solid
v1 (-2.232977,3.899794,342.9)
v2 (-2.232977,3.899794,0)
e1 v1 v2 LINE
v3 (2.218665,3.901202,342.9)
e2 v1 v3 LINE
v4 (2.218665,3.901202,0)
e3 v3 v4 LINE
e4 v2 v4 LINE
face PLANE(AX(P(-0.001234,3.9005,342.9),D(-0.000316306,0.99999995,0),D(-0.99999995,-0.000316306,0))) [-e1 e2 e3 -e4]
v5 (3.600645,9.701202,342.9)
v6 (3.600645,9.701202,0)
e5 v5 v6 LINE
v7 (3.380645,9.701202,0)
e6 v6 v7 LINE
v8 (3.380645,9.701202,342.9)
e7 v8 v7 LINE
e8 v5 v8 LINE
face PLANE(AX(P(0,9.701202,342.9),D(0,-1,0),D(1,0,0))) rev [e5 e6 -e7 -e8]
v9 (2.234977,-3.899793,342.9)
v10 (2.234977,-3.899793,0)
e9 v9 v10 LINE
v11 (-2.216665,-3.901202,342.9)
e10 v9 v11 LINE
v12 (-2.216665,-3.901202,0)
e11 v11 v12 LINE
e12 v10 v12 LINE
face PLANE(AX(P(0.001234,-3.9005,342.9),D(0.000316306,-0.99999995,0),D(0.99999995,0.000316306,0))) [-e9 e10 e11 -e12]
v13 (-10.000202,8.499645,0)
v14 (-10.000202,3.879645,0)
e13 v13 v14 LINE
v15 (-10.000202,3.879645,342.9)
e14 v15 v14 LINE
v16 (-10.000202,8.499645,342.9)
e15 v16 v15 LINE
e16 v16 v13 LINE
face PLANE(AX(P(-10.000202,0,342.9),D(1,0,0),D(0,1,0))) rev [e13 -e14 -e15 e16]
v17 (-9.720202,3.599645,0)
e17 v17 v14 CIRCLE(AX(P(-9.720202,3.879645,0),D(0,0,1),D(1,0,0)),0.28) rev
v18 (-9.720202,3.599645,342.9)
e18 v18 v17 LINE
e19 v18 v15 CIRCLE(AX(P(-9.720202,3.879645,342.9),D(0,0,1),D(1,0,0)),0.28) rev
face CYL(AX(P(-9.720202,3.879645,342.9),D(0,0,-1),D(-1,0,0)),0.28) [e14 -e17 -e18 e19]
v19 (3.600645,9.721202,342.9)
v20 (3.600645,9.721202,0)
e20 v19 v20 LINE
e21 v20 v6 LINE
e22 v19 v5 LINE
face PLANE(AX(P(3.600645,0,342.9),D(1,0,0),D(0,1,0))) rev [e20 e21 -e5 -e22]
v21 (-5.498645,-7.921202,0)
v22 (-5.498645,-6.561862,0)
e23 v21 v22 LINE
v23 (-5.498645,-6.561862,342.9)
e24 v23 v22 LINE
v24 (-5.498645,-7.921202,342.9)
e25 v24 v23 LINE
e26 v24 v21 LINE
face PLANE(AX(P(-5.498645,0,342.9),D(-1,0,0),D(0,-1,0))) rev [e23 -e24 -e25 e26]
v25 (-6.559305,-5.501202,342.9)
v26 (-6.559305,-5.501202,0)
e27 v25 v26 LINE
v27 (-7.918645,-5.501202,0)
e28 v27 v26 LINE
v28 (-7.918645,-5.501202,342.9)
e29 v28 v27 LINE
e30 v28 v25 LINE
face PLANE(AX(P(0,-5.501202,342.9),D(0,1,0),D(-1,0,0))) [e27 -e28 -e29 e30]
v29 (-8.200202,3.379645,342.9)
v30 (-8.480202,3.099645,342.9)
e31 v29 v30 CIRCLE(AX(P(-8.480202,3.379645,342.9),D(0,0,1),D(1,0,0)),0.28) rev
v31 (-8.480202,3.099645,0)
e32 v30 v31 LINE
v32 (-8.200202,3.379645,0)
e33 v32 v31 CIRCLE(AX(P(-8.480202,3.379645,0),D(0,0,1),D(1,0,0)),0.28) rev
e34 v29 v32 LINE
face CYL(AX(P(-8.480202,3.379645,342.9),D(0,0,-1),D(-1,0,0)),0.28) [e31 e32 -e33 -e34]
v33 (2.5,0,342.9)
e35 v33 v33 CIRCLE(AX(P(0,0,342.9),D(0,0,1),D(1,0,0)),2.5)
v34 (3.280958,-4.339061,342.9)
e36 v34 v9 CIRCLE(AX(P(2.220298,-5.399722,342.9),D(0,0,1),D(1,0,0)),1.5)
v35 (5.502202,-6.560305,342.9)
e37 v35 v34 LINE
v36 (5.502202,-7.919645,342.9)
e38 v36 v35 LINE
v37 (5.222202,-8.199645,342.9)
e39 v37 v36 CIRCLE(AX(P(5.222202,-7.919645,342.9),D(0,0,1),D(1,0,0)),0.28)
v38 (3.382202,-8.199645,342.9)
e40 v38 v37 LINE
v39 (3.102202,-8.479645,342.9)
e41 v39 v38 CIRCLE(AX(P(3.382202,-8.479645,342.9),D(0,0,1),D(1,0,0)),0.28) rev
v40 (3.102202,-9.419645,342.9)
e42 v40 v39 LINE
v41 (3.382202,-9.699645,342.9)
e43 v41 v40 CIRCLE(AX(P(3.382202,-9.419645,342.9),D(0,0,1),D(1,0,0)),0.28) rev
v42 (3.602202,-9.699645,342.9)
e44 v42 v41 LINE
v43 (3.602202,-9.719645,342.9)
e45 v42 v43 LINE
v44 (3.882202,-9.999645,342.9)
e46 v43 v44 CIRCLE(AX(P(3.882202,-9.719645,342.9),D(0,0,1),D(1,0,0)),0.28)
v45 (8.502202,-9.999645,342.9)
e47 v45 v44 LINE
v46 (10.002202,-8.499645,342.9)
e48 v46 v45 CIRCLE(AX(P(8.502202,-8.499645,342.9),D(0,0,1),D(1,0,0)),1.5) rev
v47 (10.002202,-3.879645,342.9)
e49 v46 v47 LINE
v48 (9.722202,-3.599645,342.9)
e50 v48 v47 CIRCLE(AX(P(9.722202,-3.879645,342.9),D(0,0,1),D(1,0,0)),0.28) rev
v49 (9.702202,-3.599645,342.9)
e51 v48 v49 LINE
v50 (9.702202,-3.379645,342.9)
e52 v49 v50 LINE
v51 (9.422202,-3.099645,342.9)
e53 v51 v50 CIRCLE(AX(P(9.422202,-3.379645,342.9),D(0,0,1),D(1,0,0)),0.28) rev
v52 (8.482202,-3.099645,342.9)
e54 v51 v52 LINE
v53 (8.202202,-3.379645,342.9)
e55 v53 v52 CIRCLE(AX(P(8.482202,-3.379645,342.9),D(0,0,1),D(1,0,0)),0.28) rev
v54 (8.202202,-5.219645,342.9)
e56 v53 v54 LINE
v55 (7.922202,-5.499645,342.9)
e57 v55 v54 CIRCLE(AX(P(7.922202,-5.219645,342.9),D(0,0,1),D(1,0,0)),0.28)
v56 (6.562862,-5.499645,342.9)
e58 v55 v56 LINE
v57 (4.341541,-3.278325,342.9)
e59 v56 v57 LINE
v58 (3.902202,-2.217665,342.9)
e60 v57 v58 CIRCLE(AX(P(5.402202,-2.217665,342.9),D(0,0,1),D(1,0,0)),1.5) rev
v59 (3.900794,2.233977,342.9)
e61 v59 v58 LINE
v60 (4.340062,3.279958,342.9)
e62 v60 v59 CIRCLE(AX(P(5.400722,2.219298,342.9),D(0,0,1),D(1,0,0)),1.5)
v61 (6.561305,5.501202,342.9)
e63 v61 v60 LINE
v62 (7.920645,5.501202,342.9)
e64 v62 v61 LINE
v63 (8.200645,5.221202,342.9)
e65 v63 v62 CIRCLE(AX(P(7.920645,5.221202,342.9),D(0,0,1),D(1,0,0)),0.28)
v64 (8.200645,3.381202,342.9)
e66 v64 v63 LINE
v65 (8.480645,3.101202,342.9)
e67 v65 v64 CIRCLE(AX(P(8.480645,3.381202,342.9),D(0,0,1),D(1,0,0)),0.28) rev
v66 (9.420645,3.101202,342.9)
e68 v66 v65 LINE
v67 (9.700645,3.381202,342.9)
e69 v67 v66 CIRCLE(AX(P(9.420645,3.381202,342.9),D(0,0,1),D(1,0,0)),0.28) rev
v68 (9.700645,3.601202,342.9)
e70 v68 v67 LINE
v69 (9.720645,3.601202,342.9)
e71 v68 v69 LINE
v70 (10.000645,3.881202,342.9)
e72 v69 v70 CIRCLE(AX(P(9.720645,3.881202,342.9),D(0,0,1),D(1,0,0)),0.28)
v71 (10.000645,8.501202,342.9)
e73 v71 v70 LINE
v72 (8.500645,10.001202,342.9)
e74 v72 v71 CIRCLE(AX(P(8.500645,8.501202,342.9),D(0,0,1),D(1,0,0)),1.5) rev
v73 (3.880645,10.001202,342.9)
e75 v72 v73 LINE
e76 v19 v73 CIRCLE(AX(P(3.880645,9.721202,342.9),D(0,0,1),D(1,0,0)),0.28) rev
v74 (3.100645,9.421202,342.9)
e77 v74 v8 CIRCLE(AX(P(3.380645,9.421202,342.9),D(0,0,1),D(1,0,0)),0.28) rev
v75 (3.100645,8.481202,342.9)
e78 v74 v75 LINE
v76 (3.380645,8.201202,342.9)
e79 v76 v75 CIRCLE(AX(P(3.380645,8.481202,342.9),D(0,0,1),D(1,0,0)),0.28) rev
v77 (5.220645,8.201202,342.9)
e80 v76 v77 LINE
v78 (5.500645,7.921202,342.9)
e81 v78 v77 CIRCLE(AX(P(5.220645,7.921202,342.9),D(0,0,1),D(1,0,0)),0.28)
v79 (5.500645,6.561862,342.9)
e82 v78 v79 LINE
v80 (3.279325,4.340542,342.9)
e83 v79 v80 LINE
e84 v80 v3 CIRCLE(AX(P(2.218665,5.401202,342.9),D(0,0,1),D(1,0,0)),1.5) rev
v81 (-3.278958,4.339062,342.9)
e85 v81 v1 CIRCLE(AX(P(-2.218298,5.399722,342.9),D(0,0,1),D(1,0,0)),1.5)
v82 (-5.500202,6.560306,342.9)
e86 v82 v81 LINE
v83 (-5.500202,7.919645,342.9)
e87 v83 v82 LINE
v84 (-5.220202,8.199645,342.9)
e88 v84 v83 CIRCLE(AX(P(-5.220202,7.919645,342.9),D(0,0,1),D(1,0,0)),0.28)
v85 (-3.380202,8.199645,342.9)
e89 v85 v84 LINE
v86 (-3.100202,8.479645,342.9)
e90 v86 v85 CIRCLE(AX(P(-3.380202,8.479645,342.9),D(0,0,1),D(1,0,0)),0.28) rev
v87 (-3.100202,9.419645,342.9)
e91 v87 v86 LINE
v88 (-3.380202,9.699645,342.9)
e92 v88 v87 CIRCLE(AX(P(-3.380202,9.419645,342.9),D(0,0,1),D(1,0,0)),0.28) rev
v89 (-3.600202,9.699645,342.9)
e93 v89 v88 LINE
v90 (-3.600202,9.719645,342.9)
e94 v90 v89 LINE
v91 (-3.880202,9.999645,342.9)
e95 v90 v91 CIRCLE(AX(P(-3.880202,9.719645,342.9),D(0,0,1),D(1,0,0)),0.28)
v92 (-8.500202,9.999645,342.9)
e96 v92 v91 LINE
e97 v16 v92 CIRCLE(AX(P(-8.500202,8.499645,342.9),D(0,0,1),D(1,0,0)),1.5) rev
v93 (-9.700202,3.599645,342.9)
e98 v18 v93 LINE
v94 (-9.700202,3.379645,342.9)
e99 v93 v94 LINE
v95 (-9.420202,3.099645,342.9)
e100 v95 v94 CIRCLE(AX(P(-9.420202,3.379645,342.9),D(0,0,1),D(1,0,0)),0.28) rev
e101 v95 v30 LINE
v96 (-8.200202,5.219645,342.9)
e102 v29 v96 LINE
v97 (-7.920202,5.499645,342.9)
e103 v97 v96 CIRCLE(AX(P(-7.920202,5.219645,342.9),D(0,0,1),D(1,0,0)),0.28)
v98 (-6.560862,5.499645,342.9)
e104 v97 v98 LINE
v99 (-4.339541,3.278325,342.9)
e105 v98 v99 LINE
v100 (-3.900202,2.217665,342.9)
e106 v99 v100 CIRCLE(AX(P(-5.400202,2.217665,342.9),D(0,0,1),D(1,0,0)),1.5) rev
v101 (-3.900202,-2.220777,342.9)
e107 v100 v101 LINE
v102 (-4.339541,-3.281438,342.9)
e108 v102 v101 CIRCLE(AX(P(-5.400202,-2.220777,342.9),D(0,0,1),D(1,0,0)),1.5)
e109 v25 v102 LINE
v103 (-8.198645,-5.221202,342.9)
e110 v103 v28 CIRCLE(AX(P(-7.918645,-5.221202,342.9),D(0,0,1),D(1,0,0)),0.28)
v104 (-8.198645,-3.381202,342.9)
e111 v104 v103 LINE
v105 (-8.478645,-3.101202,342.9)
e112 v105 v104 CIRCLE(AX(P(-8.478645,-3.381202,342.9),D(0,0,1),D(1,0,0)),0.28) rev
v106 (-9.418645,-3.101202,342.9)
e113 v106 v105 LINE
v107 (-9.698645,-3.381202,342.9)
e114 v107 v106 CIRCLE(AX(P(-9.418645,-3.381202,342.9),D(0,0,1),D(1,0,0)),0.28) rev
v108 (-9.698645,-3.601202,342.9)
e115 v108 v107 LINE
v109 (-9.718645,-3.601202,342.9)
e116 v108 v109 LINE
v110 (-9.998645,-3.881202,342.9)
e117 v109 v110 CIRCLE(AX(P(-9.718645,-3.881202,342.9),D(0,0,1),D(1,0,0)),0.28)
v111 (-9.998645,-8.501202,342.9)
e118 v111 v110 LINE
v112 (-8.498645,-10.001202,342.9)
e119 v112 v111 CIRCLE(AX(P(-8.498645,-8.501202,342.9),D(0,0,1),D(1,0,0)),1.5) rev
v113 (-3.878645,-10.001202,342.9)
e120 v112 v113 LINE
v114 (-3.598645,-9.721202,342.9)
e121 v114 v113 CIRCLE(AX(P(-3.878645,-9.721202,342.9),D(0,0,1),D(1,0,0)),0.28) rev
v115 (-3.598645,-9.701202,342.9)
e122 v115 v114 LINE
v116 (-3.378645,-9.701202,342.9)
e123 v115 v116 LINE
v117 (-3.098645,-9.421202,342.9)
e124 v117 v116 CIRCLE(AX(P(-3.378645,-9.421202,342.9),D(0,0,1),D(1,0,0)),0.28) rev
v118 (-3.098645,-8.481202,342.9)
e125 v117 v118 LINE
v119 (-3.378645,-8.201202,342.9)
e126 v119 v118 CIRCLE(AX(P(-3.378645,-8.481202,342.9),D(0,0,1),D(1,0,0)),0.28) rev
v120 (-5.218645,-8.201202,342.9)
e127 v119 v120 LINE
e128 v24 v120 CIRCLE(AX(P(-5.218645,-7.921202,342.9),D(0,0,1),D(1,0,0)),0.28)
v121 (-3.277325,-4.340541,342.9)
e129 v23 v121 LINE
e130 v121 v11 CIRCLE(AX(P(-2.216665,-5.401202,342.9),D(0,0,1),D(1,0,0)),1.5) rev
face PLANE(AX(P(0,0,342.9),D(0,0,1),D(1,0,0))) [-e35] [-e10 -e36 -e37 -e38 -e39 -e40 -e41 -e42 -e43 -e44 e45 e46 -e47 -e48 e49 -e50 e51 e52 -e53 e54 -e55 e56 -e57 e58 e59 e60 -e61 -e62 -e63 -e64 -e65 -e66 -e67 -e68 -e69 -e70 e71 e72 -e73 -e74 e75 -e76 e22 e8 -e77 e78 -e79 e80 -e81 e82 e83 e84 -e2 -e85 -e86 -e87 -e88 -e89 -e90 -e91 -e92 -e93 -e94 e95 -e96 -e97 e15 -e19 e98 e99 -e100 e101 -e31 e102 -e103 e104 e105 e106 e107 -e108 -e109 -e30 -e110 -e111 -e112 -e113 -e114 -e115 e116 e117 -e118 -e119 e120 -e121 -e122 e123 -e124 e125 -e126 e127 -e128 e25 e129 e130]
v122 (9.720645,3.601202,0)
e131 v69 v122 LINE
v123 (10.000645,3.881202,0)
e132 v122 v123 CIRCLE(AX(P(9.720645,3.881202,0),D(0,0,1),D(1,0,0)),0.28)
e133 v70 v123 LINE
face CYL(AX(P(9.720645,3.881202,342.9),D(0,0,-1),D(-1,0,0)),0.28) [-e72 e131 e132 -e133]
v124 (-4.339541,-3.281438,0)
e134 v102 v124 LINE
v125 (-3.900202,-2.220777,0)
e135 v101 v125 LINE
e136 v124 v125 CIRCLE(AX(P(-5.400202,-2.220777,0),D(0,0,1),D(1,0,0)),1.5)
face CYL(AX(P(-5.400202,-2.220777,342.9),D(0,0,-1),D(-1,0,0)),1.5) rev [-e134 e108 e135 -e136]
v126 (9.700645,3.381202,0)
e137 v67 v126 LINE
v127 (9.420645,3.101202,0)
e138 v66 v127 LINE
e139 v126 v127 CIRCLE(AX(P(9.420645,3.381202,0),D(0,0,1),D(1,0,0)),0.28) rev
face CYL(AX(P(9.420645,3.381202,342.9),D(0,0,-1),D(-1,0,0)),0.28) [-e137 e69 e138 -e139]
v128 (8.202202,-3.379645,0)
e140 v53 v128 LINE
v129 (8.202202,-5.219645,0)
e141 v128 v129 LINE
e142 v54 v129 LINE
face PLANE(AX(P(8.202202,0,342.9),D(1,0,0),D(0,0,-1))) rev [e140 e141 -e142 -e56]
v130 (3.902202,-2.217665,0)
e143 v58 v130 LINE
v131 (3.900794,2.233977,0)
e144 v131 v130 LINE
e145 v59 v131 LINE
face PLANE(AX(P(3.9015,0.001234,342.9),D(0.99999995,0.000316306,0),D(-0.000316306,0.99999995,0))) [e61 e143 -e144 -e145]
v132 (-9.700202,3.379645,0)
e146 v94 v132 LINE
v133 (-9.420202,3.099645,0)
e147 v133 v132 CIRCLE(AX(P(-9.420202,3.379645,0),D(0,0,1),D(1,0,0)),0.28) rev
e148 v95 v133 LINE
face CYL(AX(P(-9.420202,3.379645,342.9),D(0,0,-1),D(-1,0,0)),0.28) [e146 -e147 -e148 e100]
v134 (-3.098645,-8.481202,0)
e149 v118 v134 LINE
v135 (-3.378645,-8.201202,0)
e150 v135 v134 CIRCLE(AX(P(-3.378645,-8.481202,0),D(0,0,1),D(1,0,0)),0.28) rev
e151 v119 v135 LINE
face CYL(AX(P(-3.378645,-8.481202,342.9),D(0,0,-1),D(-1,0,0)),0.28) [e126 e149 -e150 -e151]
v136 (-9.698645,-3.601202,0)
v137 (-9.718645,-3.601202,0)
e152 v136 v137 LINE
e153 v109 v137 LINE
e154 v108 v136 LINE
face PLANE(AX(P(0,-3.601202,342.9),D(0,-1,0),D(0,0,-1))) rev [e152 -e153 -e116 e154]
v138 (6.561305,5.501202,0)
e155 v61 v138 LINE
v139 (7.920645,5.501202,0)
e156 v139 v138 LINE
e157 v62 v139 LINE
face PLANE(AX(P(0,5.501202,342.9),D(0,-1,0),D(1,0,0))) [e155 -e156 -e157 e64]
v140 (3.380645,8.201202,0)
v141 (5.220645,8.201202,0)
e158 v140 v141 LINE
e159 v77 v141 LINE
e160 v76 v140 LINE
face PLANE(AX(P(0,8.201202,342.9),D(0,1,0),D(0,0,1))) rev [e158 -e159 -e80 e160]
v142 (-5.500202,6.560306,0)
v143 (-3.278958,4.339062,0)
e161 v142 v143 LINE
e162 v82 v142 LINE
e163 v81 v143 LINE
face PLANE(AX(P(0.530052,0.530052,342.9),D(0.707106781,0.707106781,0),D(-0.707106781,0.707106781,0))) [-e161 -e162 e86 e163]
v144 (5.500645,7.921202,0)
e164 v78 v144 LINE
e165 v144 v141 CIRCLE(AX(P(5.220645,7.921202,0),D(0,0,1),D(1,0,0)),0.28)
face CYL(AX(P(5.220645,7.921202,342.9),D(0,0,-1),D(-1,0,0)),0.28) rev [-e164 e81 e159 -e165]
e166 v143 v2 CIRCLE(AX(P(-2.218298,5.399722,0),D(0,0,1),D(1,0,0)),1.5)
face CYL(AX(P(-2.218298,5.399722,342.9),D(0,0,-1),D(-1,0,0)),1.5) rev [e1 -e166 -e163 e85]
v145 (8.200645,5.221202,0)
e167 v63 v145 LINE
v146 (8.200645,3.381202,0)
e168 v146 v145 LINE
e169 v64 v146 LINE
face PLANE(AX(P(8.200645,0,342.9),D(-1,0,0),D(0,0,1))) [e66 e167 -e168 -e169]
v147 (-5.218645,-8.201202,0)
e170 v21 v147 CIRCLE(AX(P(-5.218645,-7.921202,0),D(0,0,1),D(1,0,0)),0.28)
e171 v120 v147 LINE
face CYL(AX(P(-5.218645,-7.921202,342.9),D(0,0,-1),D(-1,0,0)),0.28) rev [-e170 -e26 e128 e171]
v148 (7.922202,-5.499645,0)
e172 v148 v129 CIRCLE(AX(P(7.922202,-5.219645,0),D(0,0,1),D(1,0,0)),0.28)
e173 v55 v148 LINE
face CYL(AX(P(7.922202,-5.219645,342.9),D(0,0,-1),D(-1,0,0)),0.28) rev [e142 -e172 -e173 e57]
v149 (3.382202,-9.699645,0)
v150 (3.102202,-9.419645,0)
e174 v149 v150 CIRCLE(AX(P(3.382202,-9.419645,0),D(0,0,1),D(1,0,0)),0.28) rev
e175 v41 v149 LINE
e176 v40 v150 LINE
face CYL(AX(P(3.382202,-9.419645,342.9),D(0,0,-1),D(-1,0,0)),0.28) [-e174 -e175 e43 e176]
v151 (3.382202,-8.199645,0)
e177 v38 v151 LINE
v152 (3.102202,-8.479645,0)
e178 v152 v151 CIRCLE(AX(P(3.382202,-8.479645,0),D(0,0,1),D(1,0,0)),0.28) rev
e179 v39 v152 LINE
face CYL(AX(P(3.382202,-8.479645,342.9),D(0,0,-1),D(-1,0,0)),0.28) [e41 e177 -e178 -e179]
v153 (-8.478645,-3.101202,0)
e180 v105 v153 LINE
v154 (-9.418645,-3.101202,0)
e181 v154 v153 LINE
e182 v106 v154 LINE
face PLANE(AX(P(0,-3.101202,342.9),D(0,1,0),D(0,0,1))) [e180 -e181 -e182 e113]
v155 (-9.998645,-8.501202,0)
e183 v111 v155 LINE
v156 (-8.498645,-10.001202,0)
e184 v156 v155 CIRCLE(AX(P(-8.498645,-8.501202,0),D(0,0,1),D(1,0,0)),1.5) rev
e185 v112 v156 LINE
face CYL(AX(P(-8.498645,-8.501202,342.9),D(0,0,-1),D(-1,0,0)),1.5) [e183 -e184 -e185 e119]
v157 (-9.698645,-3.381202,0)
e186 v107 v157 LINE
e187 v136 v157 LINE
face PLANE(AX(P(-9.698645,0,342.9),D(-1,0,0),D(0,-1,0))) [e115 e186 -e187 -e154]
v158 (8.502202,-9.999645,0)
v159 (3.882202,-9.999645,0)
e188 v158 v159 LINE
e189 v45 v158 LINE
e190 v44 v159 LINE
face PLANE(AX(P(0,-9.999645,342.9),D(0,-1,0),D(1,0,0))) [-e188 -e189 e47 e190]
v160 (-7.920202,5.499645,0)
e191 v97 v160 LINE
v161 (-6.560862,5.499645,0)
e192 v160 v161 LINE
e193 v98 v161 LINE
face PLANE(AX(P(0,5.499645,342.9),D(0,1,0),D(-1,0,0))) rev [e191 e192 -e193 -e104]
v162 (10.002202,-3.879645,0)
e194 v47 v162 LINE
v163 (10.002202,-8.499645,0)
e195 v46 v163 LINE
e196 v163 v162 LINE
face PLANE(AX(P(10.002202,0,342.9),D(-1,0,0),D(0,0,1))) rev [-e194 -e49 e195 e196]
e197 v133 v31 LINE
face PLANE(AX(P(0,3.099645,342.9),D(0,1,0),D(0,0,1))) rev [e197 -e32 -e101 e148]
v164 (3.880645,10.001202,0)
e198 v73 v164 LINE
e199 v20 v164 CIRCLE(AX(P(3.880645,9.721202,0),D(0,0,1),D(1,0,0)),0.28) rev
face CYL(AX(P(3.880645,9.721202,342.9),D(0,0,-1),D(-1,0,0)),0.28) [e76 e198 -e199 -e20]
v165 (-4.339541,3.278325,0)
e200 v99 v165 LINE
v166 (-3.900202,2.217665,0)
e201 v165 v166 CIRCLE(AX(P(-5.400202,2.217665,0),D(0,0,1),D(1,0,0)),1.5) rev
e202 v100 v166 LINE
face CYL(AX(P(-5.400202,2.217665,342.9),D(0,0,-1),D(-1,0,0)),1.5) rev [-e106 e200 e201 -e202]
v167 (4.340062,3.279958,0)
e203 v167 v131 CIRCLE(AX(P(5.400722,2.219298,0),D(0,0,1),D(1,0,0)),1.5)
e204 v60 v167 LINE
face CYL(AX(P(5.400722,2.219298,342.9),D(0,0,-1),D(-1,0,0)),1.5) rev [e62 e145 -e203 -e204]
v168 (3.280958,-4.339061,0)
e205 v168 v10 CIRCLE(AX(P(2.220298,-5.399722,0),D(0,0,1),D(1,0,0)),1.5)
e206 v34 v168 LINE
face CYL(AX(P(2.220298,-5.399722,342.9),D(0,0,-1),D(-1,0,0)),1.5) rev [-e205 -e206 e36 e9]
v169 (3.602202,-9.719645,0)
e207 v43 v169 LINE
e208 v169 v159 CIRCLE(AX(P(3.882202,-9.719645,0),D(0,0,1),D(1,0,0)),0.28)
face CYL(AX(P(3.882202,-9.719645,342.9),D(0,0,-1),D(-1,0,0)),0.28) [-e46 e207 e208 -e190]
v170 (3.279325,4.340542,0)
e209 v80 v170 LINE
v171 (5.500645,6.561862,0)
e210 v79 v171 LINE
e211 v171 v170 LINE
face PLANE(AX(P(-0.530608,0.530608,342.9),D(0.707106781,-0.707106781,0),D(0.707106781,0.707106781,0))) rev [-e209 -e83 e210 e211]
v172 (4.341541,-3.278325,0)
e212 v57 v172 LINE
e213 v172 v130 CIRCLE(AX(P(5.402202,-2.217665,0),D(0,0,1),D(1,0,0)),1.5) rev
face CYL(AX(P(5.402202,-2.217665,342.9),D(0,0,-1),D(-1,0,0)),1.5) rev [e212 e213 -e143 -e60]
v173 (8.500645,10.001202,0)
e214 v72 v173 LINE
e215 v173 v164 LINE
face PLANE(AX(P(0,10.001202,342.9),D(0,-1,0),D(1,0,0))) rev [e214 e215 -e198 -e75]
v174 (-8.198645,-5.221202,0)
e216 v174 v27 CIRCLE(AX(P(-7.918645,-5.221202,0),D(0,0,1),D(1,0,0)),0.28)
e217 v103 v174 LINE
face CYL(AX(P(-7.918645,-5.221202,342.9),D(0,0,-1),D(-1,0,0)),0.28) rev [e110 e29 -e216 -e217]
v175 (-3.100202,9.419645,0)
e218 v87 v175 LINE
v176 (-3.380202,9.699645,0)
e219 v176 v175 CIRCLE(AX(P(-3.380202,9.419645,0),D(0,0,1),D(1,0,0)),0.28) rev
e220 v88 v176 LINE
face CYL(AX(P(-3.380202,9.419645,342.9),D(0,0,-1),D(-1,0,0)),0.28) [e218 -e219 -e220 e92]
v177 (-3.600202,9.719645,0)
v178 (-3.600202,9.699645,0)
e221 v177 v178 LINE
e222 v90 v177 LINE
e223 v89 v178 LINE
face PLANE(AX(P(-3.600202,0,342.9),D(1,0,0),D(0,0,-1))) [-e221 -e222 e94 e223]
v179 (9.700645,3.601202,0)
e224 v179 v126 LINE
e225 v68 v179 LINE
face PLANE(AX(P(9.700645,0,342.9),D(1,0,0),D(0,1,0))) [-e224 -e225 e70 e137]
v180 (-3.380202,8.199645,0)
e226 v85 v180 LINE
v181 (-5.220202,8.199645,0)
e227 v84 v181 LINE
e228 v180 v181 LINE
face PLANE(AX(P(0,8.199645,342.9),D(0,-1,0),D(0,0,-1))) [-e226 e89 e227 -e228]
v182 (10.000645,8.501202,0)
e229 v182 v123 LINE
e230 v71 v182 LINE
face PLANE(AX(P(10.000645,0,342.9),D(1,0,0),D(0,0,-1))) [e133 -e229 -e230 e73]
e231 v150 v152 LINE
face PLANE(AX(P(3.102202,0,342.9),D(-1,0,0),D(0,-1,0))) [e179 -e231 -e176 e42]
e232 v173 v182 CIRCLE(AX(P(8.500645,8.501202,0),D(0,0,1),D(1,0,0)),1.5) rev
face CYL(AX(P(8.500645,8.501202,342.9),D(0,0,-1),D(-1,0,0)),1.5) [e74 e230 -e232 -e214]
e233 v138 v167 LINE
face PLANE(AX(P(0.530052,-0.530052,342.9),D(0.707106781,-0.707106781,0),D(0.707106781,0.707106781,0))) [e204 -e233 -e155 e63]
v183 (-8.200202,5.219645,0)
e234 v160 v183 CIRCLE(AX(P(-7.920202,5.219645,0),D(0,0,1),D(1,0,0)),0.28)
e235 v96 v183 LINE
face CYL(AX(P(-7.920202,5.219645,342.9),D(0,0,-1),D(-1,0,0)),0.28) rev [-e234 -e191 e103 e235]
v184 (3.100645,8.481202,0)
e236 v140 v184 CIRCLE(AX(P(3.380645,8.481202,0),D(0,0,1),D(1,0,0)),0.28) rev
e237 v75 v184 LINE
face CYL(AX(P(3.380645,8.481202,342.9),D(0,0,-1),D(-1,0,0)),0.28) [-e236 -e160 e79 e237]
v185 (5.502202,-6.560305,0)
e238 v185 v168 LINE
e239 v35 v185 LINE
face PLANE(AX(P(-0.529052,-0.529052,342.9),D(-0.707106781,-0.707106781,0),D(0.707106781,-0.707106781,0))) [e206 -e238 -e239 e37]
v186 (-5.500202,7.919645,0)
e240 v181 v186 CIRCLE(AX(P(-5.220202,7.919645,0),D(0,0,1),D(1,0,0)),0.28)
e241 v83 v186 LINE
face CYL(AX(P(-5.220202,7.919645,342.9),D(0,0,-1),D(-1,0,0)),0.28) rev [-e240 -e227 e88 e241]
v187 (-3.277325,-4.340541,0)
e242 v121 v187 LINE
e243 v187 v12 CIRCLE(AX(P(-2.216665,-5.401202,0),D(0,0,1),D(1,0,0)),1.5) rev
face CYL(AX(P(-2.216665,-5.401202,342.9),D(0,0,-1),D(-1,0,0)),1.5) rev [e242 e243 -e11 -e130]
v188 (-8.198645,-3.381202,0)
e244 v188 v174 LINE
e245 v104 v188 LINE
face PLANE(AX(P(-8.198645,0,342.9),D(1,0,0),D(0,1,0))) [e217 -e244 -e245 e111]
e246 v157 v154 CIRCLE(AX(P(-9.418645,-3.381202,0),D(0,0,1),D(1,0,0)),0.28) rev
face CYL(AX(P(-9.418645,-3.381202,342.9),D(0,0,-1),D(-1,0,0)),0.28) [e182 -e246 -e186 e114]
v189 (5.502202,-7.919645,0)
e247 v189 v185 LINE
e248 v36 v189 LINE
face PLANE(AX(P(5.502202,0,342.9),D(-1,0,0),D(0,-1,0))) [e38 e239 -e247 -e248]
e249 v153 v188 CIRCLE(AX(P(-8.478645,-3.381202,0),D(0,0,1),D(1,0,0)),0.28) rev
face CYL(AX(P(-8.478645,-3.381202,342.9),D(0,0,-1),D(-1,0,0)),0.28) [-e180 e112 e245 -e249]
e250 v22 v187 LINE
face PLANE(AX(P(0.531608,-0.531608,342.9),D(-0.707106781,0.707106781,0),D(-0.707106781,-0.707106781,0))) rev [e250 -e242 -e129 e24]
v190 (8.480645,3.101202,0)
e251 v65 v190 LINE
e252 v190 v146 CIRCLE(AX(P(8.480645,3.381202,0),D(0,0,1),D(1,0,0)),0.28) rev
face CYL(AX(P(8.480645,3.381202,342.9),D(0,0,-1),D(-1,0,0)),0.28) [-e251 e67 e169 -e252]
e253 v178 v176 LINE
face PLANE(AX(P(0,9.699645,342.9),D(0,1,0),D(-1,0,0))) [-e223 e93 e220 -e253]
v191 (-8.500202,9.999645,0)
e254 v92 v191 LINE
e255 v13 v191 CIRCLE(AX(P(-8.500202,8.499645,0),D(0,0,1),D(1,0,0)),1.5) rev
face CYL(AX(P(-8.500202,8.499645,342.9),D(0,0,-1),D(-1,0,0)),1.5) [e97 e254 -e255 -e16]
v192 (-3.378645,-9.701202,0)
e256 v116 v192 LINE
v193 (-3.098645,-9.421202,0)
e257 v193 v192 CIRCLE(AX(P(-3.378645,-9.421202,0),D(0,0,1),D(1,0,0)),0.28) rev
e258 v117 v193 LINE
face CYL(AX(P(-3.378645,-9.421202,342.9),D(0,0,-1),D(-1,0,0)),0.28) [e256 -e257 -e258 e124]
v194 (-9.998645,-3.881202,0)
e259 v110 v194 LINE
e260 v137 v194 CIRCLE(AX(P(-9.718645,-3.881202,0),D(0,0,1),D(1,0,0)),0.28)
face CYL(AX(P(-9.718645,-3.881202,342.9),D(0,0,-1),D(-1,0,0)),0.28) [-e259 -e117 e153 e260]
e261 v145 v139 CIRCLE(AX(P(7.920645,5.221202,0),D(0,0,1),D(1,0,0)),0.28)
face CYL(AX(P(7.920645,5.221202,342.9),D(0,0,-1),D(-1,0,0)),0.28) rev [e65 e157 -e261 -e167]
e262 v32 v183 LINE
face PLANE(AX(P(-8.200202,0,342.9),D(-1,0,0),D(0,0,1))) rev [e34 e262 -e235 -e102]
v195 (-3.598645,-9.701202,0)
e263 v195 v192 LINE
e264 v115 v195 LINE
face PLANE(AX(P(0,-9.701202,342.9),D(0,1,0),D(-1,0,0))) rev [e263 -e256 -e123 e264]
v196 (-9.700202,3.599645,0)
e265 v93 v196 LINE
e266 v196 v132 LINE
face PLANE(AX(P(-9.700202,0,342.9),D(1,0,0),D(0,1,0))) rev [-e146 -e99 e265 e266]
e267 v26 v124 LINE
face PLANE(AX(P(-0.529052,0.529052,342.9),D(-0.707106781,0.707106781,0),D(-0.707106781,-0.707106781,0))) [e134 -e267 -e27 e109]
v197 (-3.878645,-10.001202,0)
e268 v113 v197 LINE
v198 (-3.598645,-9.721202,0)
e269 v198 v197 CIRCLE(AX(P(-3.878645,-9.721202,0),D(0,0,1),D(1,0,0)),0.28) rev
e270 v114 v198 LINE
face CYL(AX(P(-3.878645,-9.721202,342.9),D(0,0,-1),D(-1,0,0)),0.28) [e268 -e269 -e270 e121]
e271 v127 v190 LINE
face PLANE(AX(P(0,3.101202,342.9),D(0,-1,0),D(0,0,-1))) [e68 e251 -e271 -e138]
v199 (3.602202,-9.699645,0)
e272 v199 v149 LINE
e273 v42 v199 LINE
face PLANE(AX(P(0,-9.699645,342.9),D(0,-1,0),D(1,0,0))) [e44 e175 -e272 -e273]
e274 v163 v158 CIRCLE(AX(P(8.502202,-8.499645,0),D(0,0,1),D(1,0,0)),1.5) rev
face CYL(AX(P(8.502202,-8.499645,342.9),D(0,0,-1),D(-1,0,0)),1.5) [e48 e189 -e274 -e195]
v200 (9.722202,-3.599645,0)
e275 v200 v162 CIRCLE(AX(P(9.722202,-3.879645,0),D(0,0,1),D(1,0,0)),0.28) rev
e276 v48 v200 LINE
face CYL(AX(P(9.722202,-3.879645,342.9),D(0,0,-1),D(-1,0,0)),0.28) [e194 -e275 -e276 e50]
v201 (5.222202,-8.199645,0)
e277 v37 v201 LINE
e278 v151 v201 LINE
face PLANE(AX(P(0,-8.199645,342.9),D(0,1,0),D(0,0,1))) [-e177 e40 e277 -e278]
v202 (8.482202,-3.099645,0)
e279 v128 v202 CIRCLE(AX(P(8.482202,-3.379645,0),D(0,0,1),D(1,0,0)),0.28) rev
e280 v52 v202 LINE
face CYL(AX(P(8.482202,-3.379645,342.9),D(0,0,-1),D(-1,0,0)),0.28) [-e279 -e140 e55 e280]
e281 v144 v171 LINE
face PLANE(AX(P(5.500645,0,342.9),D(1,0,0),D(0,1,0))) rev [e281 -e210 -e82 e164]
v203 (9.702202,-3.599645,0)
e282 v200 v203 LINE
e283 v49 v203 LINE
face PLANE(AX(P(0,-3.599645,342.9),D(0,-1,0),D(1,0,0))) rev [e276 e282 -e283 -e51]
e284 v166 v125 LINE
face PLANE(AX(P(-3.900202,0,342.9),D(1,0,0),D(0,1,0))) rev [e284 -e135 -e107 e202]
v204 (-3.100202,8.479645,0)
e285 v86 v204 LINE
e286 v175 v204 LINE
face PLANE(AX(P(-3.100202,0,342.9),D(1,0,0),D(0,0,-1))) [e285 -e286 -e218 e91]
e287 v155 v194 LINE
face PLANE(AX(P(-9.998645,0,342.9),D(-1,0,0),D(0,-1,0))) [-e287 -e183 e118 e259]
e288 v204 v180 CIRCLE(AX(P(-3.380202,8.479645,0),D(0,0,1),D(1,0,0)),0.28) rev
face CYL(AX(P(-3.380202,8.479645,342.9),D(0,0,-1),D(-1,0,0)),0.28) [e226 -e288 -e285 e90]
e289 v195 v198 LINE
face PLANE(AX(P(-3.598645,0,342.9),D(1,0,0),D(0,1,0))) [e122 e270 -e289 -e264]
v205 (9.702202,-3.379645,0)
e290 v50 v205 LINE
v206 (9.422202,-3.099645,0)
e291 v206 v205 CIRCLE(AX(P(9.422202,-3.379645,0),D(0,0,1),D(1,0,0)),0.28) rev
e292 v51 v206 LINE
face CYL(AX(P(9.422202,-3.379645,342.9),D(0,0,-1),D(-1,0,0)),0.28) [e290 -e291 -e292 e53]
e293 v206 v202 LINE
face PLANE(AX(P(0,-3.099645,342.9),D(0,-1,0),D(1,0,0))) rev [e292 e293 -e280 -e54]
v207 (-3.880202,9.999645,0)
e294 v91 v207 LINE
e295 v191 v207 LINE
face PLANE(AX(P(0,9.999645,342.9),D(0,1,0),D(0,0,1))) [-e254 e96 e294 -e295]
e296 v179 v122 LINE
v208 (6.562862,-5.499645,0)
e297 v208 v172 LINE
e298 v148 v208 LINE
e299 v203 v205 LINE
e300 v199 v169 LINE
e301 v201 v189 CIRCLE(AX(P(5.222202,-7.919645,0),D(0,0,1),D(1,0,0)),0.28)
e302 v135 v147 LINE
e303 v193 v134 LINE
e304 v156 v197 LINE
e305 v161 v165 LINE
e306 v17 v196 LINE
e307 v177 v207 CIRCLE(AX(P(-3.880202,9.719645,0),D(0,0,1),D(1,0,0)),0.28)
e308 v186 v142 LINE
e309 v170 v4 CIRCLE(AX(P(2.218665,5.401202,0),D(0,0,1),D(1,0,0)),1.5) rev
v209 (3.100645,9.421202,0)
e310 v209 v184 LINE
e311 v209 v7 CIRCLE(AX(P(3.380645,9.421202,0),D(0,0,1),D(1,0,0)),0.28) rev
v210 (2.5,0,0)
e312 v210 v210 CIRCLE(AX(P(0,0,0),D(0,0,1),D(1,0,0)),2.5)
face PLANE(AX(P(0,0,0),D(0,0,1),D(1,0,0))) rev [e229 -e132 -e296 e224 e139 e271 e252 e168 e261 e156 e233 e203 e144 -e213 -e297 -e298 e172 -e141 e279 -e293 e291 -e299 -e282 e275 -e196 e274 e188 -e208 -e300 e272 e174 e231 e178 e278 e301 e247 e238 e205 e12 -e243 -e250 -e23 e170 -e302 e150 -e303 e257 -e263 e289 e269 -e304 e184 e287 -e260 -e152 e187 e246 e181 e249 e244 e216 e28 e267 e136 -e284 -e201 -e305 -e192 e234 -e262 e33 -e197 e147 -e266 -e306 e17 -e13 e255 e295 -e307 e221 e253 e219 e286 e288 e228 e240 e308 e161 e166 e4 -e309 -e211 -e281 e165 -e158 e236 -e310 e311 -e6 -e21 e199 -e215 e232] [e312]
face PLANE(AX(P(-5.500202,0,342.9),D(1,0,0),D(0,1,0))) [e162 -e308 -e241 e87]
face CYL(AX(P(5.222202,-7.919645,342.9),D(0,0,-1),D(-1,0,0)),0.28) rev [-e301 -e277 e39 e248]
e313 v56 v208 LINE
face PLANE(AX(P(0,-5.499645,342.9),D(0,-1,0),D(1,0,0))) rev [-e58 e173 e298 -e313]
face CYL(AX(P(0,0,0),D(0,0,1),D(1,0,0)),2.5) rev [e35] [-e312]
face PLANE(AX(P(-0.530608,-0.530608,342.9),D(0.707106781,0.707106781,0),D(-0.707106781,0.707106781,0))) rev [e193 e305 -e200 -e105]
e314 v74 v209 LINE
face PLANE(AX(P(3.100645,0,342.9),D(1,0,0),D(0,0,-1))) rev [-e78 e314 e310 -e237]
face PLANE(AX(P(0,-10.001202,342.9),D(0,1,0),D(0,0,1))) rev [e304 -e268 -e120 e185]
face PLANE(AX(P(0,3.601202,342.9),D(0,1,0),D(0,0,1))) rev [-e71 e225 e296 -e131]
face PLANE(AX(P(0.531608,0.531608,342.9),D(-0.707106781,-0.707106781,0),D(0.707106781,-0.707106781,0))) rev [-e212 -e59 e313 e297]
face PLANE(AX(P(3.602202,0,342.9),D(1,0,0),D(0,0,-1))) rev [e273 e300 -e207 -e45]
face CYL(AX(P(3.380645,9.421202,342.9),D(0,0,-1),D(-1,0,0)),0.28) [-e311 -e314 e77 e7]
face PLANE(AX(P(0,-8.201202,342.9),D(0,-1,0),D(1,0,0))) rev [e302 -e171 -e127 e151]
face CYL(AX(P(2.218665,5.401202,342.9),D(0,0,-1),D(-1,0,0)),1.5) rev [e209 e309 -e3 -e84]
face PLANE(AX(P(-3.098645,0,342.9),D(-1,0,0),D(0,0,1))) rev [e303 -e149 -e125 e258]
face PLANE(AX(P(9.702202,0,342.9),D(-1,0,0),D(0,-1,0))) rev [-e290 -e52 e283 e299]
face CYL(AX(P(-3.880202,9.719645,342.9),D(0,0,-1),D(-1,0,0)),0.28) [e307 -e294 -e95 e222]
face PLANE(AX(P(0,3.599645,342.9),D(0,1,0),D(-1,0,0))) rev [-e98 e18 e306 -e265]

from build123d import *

# Parameters (mm, degrees)
BOSS_EXTRUDE1_DEPTH = 342.9
F_3DSKETCH2_R       = 2.5
CUT_EXTRUDE1_DEPTH  = 344.191605484


with BuildPart() as part:
    # Sketch1 → Boss-Extrude1 (new body)
    with BuildSketch(Plane.XY):
        with BuildLine():
            ThreePointArc((-4.339541497, 3.27832502), (-4.01438237, 2.791689997), (-3.900201668, 2.217664848))
            Line((-3.900201668, 2.217664848), (-3.900201668, -2.220777458))
            ThreePointArc((-3.900201668, -2.220777458), (-4.013982246, -2.793835668), (-4.338062619, -3.279956687))
            ThreePointArc((-4.338062619, -3.279956687), (-4.338801799, -3.280697416), (-4.339541497, -3.28143763))
            Line((-4.339541497, -3.28143763), (-6.559305445, -5.501201578))
            Line((-6.559305445, -5.501201578), (-7.918645273, -5.501201578))
            ThreePointArc((-7.918645273, -5.501201578), (-8.116635172, -5.419191476), (-8.198645273, -5.221201578))
            Line((-8.198645273, -5.221201578), (-8.198645273, -3.381201578))
            ThreePointArc((-8.198645273, -3.381201578), (-8.280655374, -3.183211679), (-8.478645273, -3.101201578))
            Line((-8.478645273, -3.101201578), (-9.418645273, -3.101201578))
            ThreePointArc((-9.418645273, -3.101201578), (-9.616635172, -3.183211679), (-9.698645273, -3.381201578))
            Line((-9.698645273, -3.381201578), (-9.698645273, -3.601201578))
            Line((-9.698645273, -3.601201578), (-9.718645273, -3.601201578))
            ThreePointArc((-9.718645273, -3.601201578), (-9.916635172, -3.683211679), (-9.998645273, -3.881201578))
            Line((-9.998645273, -3.881201578), (-9.998645273, -8.501201578))
            ThreePointArc((-9.998645273, -8.501201578), (-9.559305445, -9.561861749), (-8.498645273, -10.001201578))
            Line((-8.498645273, -10.001201578), (-3.878645273, -10.001201578))
            ThreePointArc((-3.878645273, -10.001201578), (-3.680655374, -9.919191476), (-3.598645273, -9.721201578))
            Line((-3.598645273, -9.721201578), (-3.598645273, -9.701201578))
            Line((-3.598645273, -9.701201578), (-3.378645273, -9.701201578))
            ThreePointArc((-3.378645273, -9.701201578), (-3.180655374, -9.619191476), (-3.098645273, -9.421201578))
            Line((-3.098645273, -9.421201578), (-3.098645273, -8.481201578))
            ThreePointArc((-3.098645273, -8.481201578), (-3.180655374, -8.283211679), (-3.378645273, -8.201201578))
            Line((-3.378645273, -8.201201578), (-5.218645273, -8.201201578))
            ThreePointArc((-5.218645273, -8.201201578), (-5.416635172, -8.119191476), (-5.498645273, -7.921201578))
            Line((-5.498645273, -7.921201578), (-5.498645273, -6.561861749))
            Line((-5.498645273, -6.561861749), (-3.277324929, -4.340541406))
            ThreePointArc((-3.277324929, -4.340541406), (-2.790689906, -4.015382279), (-2.216664757, -3.901201578))
            Line((-2.216664757, -3.901201578), (2.234977304, -3.899793498))
            ThreePointArc((2.234977304, -3.899793498), (2.801097117, -4.016727825), (3.280957809, -4.339061494))
            Line((3.280957809, -4.339061494), (5.502201668, -6.560305354))
            Line((5.502201668, -6.560305354), (5.502201668, -7.919645182))
            ThreePointArc((5.502201668, -7.919645182), (5.420191567, -8.117635081), (5.222201668, -8.199645182))
            Line((5.222201668, -8.199645182), (3.382201668, -8.199645182))
            ThreePointArc((3.382201668, -8.199645182), (3.18421177, -8.281655283), (3.102201668, -8.479645182))
            Line((3.102201668, -8.479645182), (3.102201668, -9.419645182))
            ThreePointArc((3.102201668, -9.419645182), (3.18421177, -9.617635081), (3.382201668, -9.699645182))
            Line((3.382201668, -9.699645182), (3.602201668, -9.699645182))
            Line((3.602201668, -9.699645182), (3.602201668, -9.719645182))
            ThreePointArc((3.602201668, -9.719645182), (3.68421177, -9.917635081), (3.882201668, -9.999645182))
            Line((3.882201668, -9.999645182), (8.502201668, -9.999645182))
            ThreePointArc((8.502201668, -9.999645182), (9.56286184, -9.560305354), (10.002201668, -8.499645182))
            Line((10.002201668, -8.499645182), (10.002201668, -3.879645182))
            ThreePointArc((10.002201668, -3.879645182), (9.920191567, -3.681655283), (9.722201668, -3.599645182))
            Line((9.722201668, -3.599645182), (9.702201668, -3.599645182))
            Line((9.702201668, -3.599645182), (9.702201668, -3.379645182))
            ThreePointArc((9.702201668, -3.379645182), (9.620191567, -3.181655283), (9.422201668, -3.099645182))
            Line((9.422201668, -3.099645182), (8.482201668, -3.099645182))
            ThreePointArc((8.482201668, -3.099645182), (8.28421177, -3.181655283), (8.202201668, -3.379645182))
            Line((8.202201668, -3.379645182), (8.202201668, -5.219645182))
            ThreePointArc((8.202201668, -5.219645182), (8.120191567, -5.417635081), (7.922201668, -5.499645182))
            Line((7.922201668, -5.499645182), (6.56286184, -5.499645182))
            Line((6.56286184, -5.499645182), (4.341541497, -3.278324838))
            ThreePointArc((4.341541497, -3.278324838), (4.01638237, -2.791689815), (3.902201668, -2.217664667))
            Line((3.902201668, -2.217664667), (3.900793589, 2.233977395))
            ThreePointArc((3.900793589, 2.233977395), (4.017727916, 2.800097207), (4.340061585, 3.2799579))
            Line((4.340061585, 3.2799579), (6.561305445, 5.501201759))
            Line((6.561305445, 5.501201759), (7.920645273, 5.501201759))
            ThreePointArc((7.920645273, 5.501201759), (8.118635172, 5.419191658), (8.200645273, 5.221201759))
            Line((8.200645273, 5.221201759), (8.200645273, 3.381201759))
            ThreePointArc((8.200645273, 3.381201759), (8.282655374, 3.183211861), (8.480645273, 3.101201759))
            Line((8.480645273, 3.101201759), (9.420645273, 3.101201759))
            ThreePointArc((9.420645273, 3.101201759), (9.618635172, 3.183211861), (9.700645273, 3.381201759))
            Line((9.700645273, 3.381201759), (9.700645273, 3.601201759))
            Line((9.700645273, 3.601201759), (9.720645273, 3.601201759))
            ThreePointArc((9.720645273, 3.601201759), (9.918635172, 3.683211861), (10.000645273, 3.881201759))
            Line((10.000645273, 3.881201759), (10.000645273, 8.501201759))
            ThreePointArc((10.000645273, 8.501201759), (9.561305445, 9.561861931), (8.500645273, 10.001201759))
            Line((8.500645273, 10.001201759), (3.880645273, 10.001201759))
            ThreePointArc((3.880645273, 10.001201759), (3.682655374, 9.919191658), (3.600645273, 9.721201759))
            Line((3.600645273, 9.721201759), (3.600645273, 9.701201759))
            Line((3.600645273, 9.701201759), (3.380645273, 9.701201759))
            ThreePointArc((3.380645273, 9.701201759), (3.182655374, 9.619191658), (3.100645273, 9.421201759))
            Line((3.100645273, 9.421201759), (3.100645273, 8.481201759))
            ThreePointArc((3.100645273, 8.481201759), (3.182655374, 8.283211861), (3.380645273, 8.201201759))
            Line((3.380645273, 8.201201759), (5.220645273, 8.201201759))
            ThreePointArc((5.220645273, 8.201201759), (5.418635172, 8.119191658), (5.500645273, 7.921201759))
            Line((5.500645273, 7.921201759), (5.500645273, 6.561861931))
            Line((5.500645273, 6.561861931), (3.279324929, 4.340541588))
            ThreePointArc((3.279324929, 4.340541588), (2.792689906, 4.015382461), (2.218664757, 3.901201759))
            Line((2.218664757, 3.901201759), (-2.232977304, 3.89979368))
            ThreePointArc((-2.232977304, 3.89979368), (-2.799097117, 4.016728006), (-3.278957809, 4.339061676))
            Line((-3.278957809, 4.339061676), (-5.500201668, 6.560305535))
            Line((-5.500201668, 6.560305535), (-5.500201668, 7.919645364))
            ThreePointArc((-5.500201668, 7.919645364), (-5.418191567, 8.117635262), (-5.220201668, 8.199645364))
            Line((-5.220201668, 8.199645364), (-3.380201668, 8.199645364))
            ThreePointArc((-3.380201668, 8.199645364), (-3.18221177, 8.281655465), (-3.100201668, 8.479645364))
            Line((-3.100201668, 8.479645364), (-3.100201668, 9.419645364))
            ThreePointArc((-3.100201668, 9.419645364), (-3.18221177, 9.617635262), (-3.380201668, 9.699645364))
            Line((-3.380201668, 9.699645364), (-3.600201668, 9.699645364))
            Line((-3.600201668, 9.699645364), (-3.600201668, 9.719645364))
            ThreePointArc((-3.600201668, 9.719645364), (-3.68221177, 9.917635262), (-3.880201668, 9.999645364))
            Line((-3.880201668, 9.999645364), (-8.500201668, 9.999645364))
            ThreePointArc((-8.500201668, 9.999645364), (-9.56086184, 9.560305535), (-10.000201668, 8.499645364))
            Line((-10.000201668, 8.499645364), (-10.000201668, 3.879645364))
            ThreePointArc((-10.000201668, 3.879645364), (-9.918191567, 3.681655465), (-9.720201668, 3.599645364))
            Line((-9.720201668, 3.599645364), (-9.700201668, 3.599645364))
            Line((-9.700201668, 3.599645364), (-9.700201668, 3.379645364))
            ThreePointArc((-9.700201668, 3.379645364), (-9.618191567, 3.181655465), (-9.420201668, 3.099645364))
            Line((-9.420201668, 3.099645364), (-8.480201668, 3.099645364))
            ThreePointArc((-8.480201668, 3.099645364), (-8.28221177, 3.181655465), (-8.200201668, 3.379645364))
            Line((-8.200201668, 3.379645364), (-8.200201668, 5.219645364))
            ThreePointArc((-8.200201668, 5.219645364), (-8.118191567, 5.417635262), (-7.920201668, 5.499645364))
            Line((-7.920201668, 5.499645364), (-6.56086184, 5.499645364))
            Line((-6.56086184, 5.499645364), (-4.339541497, 3.27832502))
        make_face()
    extrude(amount=BOSS_EXTRUDE1_DEPTH)

    # 3DSketch2 → Cut-Extrude1 (cut, through all)
    with BuildSketch(Plane.XY):
        Circle(F_3DSKETCH2_R)
    extrude(amount=CUT_EXTRUDE1_DEPTH, mode=Mode.SUBTRACT)


solid = part.part
